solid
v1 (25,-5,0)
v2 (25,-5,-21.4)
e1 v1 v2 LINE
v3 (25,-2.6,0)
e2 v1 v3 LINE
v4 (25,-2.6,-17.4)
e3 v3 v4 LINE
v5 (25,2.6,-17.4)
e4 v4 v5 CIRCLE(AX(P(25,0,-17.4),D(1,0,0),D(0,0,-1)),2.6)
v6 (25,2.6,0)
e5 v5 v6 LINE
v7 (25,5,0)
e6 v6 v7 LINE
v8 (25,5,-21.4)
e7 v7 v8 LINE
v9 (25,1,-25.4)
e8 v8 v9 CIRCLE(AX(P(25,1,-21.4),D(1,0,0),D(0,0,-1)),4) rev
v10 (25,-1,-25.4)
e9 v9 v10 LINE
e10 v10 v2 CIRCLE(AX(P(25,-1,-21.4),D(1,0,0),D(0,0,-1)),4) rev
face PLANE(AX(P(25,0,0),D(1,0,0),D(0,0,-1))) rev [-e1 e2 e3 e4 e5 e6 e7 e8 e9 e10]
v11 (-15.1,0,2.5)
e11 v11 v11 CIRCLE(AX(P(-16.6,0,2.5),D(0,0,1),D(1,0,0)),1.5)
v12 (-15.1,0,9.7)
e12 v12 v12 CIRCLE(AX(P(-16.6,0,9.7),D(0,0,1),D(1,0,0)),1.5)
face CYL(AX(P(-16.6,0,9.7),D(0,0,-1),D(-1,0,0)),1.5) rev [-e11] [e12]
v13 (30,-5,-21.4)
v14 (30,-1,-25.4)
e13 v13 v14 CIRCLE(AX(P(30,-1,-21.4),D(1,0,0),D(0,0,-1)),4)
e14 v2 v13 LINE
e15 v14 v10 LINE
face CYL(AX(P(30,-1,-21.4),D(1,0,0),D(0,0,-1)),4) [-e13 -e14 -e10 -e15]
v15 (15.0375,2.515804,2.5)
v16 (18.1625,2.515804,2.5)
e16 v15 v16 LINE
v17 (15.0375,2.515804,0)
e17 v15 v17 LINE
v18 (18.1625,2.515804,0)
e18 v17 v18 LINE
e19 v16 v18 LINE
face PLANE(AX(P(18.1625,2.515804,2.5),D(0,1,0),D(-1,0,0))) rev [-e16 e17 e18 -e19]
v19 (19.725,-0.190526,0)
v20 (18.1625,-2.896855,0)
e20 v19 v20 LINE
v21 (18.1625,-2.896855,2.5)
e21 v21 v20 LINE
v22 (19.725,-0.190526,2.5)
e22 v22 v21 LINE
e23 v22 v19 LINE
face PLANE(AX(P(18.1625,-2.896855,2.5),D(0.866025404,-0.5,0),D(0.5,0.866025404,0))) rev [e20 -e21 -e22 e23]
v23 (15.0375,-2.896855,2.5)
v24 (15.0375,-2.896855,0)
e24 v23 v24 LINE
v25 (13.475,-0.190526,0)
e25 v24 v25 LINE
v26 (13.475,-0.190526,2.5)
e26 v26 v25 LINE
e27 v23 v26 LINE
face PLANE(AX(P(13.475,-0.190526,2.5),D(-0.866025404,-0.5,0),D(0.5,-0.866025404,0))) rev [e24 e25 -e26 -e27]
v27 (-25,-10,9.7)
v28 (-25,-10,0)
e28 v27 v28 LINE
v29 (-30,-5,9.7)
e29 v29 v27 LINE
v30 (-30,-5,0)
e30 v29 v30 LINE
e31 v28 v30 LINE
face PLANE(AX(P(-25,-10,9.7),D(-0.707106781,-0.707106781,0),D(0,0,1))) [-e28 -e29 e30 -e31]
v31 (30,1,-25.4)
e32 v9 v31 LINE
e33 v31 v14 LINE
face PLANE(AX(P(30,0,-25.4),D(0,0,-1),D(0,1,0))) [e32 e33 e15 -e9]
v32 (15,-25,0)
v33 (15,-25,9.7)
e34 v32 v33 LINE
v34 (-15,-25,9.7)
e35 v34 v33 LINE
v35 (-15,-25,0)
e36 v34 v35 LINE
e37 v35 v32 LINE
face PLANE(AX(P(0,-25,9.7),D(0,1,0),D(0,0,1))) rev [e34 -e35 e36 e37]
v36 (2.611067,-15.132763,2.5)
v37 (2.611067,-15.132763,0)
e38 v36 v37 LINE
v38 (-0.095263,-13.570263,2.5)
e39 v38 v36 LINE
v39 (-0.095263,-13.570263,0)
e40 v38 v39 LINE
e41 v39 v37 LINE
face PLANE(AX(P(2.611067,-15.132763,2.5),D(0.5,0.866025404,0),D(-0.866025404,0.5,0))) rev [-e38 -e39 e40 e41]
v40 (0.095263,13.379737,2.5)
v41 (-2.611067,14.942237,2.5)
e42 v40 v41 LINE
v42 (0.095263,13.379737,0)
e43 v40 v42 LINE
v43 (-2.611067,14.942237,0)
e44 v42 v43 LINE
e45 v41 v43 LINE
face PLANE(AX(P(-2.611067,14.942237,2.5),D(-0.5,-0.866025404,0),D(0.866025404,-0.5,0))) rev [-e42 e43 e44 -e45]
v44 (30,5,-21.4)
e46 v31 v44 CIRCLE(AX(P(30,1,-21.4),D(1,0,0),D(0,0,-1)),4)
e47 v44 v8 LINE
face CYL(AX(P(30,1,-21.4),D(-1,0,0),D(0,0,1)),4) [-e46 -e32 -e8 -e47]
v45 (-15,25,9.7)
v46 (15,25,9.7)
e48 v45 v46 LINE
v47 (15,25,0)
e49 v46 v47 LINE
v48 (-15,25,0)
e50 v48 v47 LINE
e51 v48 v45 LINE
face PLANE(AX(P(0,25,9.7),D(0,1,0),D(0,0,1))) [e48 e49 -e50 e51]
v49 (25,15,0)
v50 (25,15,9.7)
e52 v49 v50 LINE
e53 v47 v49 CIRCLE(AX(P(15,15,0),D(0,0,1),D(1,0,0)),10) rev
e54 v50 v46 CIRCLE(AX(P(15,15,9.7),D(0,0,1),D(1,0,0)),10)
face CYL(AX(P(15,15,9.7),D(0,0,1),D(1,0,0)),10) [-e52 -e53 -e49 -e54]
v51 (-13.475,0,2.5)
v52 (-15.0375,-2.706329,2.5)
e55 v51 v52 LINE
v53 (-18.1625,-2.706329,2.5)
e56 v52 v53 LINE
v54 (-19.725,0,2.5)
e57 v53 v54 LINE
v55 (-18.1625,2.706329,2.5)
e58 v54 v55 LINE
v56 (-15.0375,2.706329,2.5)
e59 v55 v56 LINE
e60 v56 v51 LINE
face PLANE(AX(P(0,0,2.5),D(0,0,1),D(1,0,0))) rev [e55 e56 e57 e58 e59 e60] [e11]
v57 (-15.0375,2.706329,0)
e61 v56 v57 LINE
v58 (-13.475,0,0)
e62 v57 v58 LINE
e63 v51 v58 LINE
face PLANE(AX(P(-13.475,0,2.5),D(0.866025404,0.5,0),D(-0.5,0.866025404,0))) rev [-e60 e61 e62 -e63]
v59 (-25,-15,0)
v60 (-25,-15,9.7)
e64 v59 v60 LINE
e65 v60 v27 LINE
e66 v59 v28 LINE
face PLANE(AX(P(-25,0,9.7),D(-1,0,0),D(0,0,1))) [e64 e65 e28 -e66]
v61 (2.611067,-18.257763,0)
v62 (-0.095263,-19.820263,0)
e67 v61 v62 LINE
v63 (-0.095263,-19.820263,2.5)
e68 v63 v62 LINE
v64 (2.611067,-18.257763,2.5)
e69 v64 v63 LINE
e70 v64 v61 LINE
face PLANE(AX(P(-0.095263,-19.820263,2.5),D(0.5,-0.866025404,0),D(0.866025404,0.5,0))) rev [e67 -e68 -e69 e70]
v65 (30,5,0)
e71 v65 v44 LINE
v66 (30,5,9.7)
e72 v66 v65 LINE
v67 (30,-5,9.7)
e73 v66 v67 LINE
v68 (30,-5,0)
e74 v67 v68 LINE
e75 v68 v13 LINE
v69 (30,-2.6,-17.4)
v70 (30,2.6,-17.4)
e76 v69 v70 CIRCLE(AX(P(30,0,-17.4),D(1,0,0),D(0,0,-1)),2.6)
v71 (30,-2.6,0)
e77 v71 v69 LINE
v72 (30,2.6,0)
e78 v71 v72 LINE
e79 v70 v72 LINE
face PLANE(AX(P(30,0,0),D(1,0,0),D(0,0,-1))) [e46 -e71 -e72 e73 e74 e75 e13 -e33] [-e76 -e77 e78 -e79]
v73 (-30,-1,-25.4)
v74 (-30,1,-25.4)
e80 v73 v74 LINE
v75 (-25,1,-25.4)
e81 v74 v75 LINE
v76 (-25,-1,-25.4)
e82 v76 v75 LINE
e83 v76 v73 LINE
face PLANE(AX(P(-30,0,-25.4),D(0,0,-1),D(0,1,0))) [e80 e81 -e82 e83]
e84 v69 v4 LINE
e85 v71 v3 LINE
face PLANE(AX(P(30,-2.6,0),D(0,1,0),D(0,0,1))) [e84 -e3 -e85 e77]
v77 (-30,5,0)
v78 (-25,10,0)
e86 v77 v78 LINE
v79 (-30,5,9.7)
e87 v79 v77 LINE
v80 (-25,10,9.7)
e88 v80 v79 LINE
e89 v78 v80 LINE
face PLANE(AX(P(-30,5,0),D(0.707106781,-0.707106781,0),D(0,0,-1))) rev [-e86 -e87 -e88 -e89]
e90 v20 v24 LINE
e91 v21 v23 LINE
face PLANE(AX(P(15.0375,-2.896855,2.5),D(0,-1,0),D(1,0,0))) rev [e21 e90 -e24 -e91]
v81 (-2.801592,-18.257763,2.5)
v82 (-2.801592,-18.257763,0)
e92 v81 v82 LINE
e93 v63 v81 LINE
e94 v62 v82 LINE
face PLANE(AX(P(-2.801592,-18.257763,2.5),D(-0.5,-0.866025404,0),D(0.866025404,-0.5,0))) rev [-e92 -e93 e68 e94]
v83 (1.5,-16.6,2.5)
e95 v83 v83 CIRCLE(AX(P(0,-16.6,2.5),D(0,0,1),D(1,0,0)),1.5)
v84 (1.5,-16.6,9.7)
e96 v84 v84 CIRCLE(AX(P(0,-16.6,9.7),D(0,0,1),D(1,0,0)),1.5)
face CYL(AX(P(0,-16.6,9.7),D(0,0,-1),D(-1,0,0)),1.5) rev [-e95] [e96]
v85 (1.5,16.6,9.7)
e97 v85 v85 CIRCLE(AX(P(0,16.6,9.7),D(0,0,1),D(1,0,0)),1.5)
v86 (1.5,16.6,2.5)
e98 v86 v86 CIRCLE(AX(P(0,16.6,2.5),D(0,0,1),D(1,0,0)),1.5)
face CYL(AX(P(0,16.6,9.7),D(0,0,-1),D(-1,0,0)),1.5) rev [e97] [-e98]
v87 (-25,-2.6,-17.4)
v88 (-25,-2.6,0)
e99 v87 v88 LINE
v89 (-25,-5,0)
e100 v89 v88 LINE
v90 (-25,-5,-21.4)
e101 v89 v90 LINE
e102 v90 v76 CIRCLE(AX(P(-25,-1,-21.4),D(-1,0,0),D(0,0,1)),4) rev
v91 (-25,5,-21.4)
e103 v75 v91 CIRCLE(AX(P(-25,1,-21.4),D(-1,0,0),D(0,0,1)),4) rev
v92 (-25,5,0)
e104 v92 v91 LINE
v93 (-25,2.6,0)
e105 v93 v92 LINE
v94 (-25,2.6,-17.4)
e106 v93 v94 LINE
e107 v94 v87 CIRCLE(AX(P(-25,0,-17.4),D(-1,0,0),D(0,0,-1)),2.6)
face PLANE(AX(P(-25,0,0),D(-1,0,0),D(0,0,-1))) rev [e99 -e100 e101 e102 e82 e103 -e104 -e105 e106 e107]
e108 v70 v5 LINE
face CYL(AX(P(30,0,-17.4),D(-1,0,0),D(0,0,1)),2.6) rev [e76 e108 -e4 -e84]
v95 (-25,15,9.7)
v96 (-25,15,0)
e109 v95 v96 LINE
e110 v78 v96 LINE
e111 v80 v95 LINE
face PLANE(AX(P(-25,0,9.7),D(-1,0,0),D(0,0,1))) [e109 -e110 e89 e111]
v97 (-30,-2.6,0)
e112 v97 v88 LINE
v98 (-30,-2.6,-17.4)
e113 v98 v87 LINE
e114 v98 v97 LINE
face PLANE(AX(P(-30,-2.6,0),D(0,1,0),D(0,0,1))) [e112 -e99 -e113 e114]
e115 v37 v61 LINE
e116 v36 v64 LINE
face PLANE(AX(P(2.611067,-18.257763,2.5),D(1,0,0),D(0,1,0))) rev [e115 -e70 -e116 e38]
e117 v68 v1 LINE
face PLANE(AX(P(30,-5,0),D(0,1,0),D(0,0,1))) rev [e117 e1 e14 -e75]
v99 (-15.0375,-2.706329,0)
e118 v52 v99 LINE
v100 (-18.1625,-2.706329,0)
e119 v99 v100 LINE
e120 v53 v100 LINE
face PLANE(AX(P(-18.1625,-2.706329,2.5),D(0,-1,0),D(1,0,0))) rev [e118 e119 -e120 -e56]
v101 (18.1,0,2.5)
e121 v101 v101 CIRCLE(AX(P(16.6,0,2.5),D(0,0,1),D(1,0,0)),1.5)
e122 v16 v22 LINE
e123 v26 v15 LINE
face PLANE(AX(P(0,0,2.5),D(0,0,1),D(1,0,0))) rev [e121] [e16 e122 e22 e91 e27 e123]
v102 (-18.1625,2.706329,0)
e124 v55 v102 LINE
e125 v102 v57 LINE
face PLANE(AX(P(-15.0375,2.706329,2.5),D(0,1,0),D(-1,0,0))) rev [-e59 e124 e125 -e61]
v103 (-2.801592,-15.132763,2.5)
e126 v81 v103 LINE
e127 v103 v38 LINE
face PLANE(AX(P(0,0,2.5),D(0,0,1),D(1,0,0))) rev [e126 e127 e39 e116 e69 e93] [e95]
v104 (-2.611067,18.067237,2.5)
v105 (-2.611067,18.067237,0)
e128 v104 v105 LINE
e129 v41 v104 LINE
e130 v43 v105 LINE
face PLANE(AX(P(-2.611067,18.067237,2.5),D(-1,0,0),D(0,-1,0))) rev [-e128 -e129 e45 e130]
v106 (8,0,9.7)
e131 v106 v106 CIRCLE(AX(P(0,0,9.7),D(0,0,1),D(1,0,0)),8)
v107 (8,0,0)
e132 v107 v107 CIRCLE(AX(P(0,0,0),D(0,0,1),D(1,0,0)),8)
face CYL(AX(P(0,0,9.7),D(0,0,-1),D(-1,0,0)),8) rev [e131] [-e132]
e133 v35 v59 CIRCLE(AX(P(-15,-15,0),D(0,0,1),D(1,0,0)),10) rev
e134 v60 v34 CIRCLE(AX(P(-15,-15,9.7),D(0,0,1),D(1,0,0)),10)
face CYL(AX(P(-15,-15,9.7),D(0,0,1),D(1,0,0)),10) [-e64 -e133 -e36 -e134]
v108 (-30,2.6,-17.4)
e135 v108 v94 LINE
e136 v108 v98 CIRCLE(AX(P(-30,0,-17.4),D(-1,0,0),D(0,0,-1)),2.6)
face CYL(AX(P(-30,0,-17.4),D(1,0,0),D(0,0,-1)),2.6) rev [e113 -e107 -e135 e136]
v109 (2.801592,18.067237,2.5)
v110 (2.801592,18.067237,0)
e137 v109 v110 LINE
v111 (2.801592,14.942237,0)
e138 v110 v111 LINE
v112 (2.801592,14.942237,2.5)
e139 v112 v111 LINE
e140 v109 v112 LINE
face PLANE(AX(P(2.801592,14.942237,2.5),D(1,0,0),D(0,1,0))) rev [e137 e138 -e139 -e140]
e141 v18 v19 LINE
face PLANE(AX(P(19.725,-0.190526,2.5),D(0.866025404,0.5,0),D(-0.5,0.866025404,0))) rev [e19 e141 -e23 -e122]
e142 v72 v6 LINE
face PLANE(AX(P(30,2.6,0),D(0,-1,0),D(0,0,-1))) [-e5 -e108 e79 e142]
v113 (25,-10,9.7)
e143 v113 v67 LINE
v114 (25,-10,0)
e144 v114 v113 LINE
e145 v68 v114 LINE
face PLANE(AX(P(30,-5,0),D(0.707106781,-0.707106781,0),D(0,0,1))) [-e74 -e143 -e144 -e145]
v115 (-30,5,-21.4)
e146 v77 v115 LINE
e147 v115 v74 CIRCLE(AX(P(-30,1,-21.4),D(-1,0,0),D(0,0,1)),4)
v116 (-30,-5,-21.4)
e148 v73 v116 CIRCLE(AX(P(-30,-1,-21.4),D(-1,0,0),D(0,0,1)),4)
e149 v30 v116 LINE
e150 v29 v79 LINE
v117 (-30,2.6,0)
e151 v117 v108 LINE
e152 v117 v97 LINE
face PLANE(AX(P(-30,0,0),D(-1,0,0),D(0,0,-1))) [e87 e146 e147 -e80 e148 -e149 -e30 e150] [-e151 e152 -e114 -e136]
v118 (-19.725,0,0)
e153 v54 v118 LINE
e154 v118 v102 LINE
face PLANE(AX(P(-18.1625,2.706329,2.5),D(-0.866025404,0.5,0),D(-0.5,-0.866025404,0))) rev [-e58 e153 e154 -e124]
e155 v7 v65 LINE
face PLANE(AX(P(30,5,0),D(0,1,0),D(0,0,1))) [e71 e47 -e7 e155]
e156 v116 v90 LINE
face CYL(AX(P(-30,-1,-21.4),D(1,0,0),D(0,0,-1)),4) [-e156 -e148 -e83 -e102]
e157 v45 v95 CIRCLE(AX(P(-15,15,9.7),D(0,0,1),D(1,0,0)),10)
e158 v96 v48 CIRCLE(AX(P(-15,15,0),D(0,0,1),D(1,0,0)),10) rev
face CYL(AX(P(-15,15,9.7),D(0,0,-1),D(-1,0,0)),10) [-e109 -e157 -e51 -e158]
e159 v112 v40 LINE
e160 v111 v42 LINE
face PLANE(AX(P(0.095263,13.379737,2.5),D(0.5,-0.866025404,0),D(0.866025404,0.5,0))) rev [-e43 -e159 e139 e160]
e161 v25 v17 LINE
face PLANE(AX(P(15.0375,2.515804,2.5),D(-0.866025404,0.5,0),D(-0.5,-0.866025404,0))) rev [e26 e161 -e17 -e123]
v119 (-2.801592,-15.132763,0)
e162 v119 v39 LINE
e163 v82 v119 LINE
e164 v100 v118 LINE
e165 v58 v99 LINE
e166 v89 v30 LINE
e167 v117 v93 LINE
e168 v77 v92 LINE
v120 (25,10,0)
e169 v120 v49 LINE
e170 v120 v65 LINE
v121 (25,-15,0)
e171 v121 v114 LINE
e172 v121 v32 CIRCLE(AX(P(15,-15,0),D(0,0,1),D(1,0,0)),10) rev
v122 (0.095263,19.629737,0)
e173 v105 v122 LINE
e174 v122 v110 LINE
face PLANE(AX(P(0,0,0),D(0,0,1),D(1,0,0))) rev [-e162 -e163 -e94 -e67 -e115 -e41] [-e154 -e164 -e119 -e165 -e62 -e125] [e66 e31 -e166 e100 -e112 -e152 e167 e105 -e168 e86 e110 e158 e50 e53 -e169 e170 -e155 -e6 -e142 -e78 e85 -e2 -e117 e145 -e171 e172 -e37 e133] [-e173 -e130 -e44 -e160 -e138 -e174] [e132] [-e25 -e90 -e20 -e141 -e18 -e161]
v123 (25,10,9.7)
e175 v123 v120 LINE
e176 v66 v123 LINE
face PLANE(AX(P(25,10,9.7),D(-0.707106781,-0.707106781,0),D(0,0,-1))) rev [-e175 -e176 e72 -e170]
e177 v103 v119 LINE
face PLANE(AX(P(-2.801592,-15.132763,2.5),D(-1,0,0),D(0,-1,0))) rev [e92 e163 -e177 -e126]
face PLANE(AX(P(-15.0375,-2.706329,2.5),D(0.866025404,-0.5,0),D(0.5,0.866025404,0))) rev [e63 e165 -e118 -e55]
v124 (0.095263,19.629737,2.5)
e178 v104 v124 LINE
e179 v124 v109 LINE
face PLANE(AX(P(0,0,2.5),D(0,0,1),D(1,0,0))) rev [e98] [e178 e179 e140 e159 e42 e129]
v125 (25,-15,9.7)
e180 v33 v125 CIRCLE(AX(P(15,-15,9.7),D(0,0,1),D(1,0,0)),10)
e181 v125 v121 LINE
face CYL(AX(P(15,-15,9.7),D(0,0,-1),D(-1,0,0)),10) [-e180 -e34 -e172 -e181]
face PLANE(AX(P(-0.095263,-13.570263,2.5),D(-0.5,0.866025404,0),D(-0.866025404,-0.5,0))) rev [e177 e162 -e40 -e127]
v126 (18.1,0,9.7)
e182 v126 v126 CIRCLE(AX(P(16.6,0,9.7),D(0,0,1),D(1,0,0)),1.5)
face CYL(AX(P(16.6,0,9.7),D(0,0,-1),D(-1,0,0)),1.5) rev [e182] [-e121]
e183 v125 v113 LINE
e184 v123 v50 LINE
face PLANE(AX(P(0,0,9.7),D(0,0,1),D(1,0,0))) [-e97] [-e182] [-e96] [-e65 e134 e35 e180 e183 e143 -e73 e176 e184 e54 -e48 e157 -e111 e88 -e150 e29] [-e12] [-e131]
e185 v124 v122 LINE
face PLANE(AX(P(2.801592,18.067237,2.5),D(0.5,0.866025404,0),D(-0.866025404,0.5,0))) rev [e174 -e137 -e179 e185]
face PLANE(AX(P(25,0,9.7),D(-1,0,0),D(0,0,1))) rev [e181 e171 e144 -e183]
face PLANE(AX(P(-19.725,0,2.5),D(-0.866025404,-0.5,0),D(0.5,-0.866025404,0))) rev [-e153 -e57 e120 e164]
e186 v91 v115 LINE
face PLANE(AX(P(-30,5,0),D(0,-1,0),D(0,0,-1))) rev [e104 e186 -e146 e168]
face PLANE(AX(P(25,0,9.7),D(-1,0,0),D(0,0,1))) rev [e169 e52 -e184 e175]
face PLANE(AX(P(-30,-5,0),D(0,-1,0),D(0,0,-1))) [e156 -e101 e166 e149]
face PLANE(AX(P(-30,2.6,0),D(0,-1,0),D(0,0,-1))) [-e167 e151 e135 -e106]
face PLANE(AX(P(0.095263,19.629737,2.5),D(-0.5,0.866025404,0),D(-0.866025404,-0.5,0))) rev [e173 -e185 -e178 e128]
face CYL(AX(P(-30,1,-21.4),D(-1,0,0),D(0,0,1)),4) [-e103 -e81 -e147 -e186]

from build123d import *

# Parameters (mm, degrees)
SKETCH1_W           = 50
SKETCH1_H           = 50
SKETCH1_R           = 8
SKETCH1_R_2         = 1.5
BOSS_EXTRUDE1_DEPTH = 9.7
FILLET2_R           = 10
BOSS_EXTRUDE3_DEPTH = 5
CIRPATTERN6_COUNT   = 2
CUT_EXTRUDE1_DEPTH  = 2.5
FILLET3_R           = 4
CHAMFER2_SIZE       = 5


with BuildPart() as part:
    # Sketch1 → Boss-Extrude1 (new body)
    with BuildSketch(Plane.XY):
        Rectangle(SKETCH1_W, SKETCH1_H)
        Circle(SKETCH1_R, mode=Mode.SUBTRACT)
        with Locations((16.6, 0)):
            Circle(SKETCH1_R_2, mode=Mode.SUBTRACT)
        with Locations((0, -16.6)):
            Circle(SKETCH1_R_2, mode=Mode.SUBTRACT)
        with Locations((-16.6, 0)):
            Circle(SKETCH1_R_2, mode=Mode.SUBTRACT)
        with Locations((0, 16.6)):
            Circle(SKETCH1_R_2, mode=Mode.SUBTRACT)
    extrude(amount=BOSS_EXTRUDE1_DEPTH)

    # Fillet2
    fillet2_edges = [part.edges().sort_by_distance(p)[0] for p in [
        (-25, -25, 4.85),
        (-25, 25, 4.85),
        (25, 25, 4.85),
        (25, -25, 4.85),
    ]]
    fillet(fillet2_edges, radius=FILLET2_R)

    # Sketch7 → Boss-Extrude3 (add)
    with BuildSketch(Plane(origin=(25, 0, 0), x_dir=(0, 0, -1), z_dir=(1, 0, 0))):
        with BuildLine():
            Line((25.4, 5), (0, 5))
            Line((0, 5), (0, 2.6))
            Line((0, 2.6), (17.4, 2.6))
            ThreePointArc((17.4, 2.6), (19.238477631, 1.838477631), (20, 0))
            ThreePointArc((20, 0), (19.238477631, -1.838477631), (17.4, -2.6))
            Line((17.4, -2.6), (0, -2.6))
            Line((0, -2.6), (0, -5))
            Line((0, -5), (25.4, -5))
            Line((25.4, -5), (25.4, 5))
        make_face()
        Polygon((0, 5), (-9.7, 5), (-9.7, -5), (0, -5), (0, -2.6), (0, 2.6), align=None)
    boss_extrude3 = extrude(amount=BOSS_EXTRUDE3_DEPTH)

    # CirPattern6: Boss-Extrude3 ×2 about axis
    cirpattern6_axis = Axis((0, 0, 0), (0, 0, 1))
    for i in range(1, CIRPATTERN6_COUNT):
        add(boss_extrude3.rotate(cirpattern6_axis, i * 360 / CIRPATTERN6_COUNT))

    # Sketch9 → Cut-Extrude1 (cut)
    with BuildSketch(Plane(origin=(0, 0, 0), x_dir=(-1, 0, 0), z_dir=(0, 0, -1))):
        Polygon((2.801592181, -15.132762794), (2.801592181, -18.257762794), (0.095262794, -19.820262794), (-2.611066592, -18.257762794), (-2.611066592, -15.132762794), (0.095262794, -13.570262794), align=None)
        Polygon((18.1625, -2.706329387), (15.0375, -2.706329387), (13.475, 0), (15.0375, 2.706329387), (18.1625, 2.706329387), (19.725, 0), align=None)
        Polygon((2.611066592, 14.942237206), (-0.095262794, 13.379737206), (-2.801592181, 14.942237206), (-2.801592181, 18.067237206), (-0.095262794, 19.629737206), (2.611066592, 18.067237206), align=None)
        Polygon((-13.475, -0.190525589), (-15.0375, -2.896854976), (-18.1625, -2.896854976), (-19.725, -0.190525589), (-18.1625, 2.515803798), (-15.0375, 2.515803798), align=None)
    extrude(amount=-CUT_EXTRUDE1_DEPTH, mode=Mode.SUBTRACT)

    # Fillet3
    fillet3_edges = [part.edges().sort_by_distance(p)[0] for p in [
        (27.5, -5, -25.4),
        (27.5, 5, -25.4),
        (-27.5, 5, -25.4),
        (-27.5, -5, -25.4),
    ]]
    fillet(fillet3_edges, radius=FILLET3_R)

    # Chamfer2
    # the kernel refuses this chamfer: 5 mm, written as the material it adds along each edge
    with BuildSketch(Plane(origin=(-25, 5, 0), x_dir=(-0.9996219169112968, -0.027495876610586147, 0), z_dir=(0, 0, 1)), Plane(origin=(25, 5, 0), x_dir=(-0.027495876610586317, 0.9996219169112968, 0), z_dir=(0, 0, 1))) as chamfer2_piece_1:
        Polygon((CHAMFER2_SIZE * 0.999621916911, -CHAMFER2_SIZE * 0.0274958766106), (-CHAMFER2_SIZE * 0.0274958766106, -CHAMFER2_SIZE * 0.999621916911), (0, 0), align=None)
    extrude(amount=9.7)
    with BuildSketch(Plane(origin=(-25, -5, 0), x_dir=(-0.9996219169112968, 0.02749587661058649, 0), z_dir=(0, 0, 1)), Plane(origin=(25, -5, 0), x_dir=(-0.027495876610586317, -0.9996219169112968, 0), z_dir=(0, 0, 1))) as chamfer2_piece_2:
        Polygon((CHAMFER2_SIZE * 0.999621916911, CHAMFER2_SIZE * 0.0274958766106), (-CHAMFER2_SIZE * 0.0274958766106, CHAMFER2_SIZE * 0.999621916911), (0, 0), align=None)
    extrude(amount=9.7)


solid = part.part
